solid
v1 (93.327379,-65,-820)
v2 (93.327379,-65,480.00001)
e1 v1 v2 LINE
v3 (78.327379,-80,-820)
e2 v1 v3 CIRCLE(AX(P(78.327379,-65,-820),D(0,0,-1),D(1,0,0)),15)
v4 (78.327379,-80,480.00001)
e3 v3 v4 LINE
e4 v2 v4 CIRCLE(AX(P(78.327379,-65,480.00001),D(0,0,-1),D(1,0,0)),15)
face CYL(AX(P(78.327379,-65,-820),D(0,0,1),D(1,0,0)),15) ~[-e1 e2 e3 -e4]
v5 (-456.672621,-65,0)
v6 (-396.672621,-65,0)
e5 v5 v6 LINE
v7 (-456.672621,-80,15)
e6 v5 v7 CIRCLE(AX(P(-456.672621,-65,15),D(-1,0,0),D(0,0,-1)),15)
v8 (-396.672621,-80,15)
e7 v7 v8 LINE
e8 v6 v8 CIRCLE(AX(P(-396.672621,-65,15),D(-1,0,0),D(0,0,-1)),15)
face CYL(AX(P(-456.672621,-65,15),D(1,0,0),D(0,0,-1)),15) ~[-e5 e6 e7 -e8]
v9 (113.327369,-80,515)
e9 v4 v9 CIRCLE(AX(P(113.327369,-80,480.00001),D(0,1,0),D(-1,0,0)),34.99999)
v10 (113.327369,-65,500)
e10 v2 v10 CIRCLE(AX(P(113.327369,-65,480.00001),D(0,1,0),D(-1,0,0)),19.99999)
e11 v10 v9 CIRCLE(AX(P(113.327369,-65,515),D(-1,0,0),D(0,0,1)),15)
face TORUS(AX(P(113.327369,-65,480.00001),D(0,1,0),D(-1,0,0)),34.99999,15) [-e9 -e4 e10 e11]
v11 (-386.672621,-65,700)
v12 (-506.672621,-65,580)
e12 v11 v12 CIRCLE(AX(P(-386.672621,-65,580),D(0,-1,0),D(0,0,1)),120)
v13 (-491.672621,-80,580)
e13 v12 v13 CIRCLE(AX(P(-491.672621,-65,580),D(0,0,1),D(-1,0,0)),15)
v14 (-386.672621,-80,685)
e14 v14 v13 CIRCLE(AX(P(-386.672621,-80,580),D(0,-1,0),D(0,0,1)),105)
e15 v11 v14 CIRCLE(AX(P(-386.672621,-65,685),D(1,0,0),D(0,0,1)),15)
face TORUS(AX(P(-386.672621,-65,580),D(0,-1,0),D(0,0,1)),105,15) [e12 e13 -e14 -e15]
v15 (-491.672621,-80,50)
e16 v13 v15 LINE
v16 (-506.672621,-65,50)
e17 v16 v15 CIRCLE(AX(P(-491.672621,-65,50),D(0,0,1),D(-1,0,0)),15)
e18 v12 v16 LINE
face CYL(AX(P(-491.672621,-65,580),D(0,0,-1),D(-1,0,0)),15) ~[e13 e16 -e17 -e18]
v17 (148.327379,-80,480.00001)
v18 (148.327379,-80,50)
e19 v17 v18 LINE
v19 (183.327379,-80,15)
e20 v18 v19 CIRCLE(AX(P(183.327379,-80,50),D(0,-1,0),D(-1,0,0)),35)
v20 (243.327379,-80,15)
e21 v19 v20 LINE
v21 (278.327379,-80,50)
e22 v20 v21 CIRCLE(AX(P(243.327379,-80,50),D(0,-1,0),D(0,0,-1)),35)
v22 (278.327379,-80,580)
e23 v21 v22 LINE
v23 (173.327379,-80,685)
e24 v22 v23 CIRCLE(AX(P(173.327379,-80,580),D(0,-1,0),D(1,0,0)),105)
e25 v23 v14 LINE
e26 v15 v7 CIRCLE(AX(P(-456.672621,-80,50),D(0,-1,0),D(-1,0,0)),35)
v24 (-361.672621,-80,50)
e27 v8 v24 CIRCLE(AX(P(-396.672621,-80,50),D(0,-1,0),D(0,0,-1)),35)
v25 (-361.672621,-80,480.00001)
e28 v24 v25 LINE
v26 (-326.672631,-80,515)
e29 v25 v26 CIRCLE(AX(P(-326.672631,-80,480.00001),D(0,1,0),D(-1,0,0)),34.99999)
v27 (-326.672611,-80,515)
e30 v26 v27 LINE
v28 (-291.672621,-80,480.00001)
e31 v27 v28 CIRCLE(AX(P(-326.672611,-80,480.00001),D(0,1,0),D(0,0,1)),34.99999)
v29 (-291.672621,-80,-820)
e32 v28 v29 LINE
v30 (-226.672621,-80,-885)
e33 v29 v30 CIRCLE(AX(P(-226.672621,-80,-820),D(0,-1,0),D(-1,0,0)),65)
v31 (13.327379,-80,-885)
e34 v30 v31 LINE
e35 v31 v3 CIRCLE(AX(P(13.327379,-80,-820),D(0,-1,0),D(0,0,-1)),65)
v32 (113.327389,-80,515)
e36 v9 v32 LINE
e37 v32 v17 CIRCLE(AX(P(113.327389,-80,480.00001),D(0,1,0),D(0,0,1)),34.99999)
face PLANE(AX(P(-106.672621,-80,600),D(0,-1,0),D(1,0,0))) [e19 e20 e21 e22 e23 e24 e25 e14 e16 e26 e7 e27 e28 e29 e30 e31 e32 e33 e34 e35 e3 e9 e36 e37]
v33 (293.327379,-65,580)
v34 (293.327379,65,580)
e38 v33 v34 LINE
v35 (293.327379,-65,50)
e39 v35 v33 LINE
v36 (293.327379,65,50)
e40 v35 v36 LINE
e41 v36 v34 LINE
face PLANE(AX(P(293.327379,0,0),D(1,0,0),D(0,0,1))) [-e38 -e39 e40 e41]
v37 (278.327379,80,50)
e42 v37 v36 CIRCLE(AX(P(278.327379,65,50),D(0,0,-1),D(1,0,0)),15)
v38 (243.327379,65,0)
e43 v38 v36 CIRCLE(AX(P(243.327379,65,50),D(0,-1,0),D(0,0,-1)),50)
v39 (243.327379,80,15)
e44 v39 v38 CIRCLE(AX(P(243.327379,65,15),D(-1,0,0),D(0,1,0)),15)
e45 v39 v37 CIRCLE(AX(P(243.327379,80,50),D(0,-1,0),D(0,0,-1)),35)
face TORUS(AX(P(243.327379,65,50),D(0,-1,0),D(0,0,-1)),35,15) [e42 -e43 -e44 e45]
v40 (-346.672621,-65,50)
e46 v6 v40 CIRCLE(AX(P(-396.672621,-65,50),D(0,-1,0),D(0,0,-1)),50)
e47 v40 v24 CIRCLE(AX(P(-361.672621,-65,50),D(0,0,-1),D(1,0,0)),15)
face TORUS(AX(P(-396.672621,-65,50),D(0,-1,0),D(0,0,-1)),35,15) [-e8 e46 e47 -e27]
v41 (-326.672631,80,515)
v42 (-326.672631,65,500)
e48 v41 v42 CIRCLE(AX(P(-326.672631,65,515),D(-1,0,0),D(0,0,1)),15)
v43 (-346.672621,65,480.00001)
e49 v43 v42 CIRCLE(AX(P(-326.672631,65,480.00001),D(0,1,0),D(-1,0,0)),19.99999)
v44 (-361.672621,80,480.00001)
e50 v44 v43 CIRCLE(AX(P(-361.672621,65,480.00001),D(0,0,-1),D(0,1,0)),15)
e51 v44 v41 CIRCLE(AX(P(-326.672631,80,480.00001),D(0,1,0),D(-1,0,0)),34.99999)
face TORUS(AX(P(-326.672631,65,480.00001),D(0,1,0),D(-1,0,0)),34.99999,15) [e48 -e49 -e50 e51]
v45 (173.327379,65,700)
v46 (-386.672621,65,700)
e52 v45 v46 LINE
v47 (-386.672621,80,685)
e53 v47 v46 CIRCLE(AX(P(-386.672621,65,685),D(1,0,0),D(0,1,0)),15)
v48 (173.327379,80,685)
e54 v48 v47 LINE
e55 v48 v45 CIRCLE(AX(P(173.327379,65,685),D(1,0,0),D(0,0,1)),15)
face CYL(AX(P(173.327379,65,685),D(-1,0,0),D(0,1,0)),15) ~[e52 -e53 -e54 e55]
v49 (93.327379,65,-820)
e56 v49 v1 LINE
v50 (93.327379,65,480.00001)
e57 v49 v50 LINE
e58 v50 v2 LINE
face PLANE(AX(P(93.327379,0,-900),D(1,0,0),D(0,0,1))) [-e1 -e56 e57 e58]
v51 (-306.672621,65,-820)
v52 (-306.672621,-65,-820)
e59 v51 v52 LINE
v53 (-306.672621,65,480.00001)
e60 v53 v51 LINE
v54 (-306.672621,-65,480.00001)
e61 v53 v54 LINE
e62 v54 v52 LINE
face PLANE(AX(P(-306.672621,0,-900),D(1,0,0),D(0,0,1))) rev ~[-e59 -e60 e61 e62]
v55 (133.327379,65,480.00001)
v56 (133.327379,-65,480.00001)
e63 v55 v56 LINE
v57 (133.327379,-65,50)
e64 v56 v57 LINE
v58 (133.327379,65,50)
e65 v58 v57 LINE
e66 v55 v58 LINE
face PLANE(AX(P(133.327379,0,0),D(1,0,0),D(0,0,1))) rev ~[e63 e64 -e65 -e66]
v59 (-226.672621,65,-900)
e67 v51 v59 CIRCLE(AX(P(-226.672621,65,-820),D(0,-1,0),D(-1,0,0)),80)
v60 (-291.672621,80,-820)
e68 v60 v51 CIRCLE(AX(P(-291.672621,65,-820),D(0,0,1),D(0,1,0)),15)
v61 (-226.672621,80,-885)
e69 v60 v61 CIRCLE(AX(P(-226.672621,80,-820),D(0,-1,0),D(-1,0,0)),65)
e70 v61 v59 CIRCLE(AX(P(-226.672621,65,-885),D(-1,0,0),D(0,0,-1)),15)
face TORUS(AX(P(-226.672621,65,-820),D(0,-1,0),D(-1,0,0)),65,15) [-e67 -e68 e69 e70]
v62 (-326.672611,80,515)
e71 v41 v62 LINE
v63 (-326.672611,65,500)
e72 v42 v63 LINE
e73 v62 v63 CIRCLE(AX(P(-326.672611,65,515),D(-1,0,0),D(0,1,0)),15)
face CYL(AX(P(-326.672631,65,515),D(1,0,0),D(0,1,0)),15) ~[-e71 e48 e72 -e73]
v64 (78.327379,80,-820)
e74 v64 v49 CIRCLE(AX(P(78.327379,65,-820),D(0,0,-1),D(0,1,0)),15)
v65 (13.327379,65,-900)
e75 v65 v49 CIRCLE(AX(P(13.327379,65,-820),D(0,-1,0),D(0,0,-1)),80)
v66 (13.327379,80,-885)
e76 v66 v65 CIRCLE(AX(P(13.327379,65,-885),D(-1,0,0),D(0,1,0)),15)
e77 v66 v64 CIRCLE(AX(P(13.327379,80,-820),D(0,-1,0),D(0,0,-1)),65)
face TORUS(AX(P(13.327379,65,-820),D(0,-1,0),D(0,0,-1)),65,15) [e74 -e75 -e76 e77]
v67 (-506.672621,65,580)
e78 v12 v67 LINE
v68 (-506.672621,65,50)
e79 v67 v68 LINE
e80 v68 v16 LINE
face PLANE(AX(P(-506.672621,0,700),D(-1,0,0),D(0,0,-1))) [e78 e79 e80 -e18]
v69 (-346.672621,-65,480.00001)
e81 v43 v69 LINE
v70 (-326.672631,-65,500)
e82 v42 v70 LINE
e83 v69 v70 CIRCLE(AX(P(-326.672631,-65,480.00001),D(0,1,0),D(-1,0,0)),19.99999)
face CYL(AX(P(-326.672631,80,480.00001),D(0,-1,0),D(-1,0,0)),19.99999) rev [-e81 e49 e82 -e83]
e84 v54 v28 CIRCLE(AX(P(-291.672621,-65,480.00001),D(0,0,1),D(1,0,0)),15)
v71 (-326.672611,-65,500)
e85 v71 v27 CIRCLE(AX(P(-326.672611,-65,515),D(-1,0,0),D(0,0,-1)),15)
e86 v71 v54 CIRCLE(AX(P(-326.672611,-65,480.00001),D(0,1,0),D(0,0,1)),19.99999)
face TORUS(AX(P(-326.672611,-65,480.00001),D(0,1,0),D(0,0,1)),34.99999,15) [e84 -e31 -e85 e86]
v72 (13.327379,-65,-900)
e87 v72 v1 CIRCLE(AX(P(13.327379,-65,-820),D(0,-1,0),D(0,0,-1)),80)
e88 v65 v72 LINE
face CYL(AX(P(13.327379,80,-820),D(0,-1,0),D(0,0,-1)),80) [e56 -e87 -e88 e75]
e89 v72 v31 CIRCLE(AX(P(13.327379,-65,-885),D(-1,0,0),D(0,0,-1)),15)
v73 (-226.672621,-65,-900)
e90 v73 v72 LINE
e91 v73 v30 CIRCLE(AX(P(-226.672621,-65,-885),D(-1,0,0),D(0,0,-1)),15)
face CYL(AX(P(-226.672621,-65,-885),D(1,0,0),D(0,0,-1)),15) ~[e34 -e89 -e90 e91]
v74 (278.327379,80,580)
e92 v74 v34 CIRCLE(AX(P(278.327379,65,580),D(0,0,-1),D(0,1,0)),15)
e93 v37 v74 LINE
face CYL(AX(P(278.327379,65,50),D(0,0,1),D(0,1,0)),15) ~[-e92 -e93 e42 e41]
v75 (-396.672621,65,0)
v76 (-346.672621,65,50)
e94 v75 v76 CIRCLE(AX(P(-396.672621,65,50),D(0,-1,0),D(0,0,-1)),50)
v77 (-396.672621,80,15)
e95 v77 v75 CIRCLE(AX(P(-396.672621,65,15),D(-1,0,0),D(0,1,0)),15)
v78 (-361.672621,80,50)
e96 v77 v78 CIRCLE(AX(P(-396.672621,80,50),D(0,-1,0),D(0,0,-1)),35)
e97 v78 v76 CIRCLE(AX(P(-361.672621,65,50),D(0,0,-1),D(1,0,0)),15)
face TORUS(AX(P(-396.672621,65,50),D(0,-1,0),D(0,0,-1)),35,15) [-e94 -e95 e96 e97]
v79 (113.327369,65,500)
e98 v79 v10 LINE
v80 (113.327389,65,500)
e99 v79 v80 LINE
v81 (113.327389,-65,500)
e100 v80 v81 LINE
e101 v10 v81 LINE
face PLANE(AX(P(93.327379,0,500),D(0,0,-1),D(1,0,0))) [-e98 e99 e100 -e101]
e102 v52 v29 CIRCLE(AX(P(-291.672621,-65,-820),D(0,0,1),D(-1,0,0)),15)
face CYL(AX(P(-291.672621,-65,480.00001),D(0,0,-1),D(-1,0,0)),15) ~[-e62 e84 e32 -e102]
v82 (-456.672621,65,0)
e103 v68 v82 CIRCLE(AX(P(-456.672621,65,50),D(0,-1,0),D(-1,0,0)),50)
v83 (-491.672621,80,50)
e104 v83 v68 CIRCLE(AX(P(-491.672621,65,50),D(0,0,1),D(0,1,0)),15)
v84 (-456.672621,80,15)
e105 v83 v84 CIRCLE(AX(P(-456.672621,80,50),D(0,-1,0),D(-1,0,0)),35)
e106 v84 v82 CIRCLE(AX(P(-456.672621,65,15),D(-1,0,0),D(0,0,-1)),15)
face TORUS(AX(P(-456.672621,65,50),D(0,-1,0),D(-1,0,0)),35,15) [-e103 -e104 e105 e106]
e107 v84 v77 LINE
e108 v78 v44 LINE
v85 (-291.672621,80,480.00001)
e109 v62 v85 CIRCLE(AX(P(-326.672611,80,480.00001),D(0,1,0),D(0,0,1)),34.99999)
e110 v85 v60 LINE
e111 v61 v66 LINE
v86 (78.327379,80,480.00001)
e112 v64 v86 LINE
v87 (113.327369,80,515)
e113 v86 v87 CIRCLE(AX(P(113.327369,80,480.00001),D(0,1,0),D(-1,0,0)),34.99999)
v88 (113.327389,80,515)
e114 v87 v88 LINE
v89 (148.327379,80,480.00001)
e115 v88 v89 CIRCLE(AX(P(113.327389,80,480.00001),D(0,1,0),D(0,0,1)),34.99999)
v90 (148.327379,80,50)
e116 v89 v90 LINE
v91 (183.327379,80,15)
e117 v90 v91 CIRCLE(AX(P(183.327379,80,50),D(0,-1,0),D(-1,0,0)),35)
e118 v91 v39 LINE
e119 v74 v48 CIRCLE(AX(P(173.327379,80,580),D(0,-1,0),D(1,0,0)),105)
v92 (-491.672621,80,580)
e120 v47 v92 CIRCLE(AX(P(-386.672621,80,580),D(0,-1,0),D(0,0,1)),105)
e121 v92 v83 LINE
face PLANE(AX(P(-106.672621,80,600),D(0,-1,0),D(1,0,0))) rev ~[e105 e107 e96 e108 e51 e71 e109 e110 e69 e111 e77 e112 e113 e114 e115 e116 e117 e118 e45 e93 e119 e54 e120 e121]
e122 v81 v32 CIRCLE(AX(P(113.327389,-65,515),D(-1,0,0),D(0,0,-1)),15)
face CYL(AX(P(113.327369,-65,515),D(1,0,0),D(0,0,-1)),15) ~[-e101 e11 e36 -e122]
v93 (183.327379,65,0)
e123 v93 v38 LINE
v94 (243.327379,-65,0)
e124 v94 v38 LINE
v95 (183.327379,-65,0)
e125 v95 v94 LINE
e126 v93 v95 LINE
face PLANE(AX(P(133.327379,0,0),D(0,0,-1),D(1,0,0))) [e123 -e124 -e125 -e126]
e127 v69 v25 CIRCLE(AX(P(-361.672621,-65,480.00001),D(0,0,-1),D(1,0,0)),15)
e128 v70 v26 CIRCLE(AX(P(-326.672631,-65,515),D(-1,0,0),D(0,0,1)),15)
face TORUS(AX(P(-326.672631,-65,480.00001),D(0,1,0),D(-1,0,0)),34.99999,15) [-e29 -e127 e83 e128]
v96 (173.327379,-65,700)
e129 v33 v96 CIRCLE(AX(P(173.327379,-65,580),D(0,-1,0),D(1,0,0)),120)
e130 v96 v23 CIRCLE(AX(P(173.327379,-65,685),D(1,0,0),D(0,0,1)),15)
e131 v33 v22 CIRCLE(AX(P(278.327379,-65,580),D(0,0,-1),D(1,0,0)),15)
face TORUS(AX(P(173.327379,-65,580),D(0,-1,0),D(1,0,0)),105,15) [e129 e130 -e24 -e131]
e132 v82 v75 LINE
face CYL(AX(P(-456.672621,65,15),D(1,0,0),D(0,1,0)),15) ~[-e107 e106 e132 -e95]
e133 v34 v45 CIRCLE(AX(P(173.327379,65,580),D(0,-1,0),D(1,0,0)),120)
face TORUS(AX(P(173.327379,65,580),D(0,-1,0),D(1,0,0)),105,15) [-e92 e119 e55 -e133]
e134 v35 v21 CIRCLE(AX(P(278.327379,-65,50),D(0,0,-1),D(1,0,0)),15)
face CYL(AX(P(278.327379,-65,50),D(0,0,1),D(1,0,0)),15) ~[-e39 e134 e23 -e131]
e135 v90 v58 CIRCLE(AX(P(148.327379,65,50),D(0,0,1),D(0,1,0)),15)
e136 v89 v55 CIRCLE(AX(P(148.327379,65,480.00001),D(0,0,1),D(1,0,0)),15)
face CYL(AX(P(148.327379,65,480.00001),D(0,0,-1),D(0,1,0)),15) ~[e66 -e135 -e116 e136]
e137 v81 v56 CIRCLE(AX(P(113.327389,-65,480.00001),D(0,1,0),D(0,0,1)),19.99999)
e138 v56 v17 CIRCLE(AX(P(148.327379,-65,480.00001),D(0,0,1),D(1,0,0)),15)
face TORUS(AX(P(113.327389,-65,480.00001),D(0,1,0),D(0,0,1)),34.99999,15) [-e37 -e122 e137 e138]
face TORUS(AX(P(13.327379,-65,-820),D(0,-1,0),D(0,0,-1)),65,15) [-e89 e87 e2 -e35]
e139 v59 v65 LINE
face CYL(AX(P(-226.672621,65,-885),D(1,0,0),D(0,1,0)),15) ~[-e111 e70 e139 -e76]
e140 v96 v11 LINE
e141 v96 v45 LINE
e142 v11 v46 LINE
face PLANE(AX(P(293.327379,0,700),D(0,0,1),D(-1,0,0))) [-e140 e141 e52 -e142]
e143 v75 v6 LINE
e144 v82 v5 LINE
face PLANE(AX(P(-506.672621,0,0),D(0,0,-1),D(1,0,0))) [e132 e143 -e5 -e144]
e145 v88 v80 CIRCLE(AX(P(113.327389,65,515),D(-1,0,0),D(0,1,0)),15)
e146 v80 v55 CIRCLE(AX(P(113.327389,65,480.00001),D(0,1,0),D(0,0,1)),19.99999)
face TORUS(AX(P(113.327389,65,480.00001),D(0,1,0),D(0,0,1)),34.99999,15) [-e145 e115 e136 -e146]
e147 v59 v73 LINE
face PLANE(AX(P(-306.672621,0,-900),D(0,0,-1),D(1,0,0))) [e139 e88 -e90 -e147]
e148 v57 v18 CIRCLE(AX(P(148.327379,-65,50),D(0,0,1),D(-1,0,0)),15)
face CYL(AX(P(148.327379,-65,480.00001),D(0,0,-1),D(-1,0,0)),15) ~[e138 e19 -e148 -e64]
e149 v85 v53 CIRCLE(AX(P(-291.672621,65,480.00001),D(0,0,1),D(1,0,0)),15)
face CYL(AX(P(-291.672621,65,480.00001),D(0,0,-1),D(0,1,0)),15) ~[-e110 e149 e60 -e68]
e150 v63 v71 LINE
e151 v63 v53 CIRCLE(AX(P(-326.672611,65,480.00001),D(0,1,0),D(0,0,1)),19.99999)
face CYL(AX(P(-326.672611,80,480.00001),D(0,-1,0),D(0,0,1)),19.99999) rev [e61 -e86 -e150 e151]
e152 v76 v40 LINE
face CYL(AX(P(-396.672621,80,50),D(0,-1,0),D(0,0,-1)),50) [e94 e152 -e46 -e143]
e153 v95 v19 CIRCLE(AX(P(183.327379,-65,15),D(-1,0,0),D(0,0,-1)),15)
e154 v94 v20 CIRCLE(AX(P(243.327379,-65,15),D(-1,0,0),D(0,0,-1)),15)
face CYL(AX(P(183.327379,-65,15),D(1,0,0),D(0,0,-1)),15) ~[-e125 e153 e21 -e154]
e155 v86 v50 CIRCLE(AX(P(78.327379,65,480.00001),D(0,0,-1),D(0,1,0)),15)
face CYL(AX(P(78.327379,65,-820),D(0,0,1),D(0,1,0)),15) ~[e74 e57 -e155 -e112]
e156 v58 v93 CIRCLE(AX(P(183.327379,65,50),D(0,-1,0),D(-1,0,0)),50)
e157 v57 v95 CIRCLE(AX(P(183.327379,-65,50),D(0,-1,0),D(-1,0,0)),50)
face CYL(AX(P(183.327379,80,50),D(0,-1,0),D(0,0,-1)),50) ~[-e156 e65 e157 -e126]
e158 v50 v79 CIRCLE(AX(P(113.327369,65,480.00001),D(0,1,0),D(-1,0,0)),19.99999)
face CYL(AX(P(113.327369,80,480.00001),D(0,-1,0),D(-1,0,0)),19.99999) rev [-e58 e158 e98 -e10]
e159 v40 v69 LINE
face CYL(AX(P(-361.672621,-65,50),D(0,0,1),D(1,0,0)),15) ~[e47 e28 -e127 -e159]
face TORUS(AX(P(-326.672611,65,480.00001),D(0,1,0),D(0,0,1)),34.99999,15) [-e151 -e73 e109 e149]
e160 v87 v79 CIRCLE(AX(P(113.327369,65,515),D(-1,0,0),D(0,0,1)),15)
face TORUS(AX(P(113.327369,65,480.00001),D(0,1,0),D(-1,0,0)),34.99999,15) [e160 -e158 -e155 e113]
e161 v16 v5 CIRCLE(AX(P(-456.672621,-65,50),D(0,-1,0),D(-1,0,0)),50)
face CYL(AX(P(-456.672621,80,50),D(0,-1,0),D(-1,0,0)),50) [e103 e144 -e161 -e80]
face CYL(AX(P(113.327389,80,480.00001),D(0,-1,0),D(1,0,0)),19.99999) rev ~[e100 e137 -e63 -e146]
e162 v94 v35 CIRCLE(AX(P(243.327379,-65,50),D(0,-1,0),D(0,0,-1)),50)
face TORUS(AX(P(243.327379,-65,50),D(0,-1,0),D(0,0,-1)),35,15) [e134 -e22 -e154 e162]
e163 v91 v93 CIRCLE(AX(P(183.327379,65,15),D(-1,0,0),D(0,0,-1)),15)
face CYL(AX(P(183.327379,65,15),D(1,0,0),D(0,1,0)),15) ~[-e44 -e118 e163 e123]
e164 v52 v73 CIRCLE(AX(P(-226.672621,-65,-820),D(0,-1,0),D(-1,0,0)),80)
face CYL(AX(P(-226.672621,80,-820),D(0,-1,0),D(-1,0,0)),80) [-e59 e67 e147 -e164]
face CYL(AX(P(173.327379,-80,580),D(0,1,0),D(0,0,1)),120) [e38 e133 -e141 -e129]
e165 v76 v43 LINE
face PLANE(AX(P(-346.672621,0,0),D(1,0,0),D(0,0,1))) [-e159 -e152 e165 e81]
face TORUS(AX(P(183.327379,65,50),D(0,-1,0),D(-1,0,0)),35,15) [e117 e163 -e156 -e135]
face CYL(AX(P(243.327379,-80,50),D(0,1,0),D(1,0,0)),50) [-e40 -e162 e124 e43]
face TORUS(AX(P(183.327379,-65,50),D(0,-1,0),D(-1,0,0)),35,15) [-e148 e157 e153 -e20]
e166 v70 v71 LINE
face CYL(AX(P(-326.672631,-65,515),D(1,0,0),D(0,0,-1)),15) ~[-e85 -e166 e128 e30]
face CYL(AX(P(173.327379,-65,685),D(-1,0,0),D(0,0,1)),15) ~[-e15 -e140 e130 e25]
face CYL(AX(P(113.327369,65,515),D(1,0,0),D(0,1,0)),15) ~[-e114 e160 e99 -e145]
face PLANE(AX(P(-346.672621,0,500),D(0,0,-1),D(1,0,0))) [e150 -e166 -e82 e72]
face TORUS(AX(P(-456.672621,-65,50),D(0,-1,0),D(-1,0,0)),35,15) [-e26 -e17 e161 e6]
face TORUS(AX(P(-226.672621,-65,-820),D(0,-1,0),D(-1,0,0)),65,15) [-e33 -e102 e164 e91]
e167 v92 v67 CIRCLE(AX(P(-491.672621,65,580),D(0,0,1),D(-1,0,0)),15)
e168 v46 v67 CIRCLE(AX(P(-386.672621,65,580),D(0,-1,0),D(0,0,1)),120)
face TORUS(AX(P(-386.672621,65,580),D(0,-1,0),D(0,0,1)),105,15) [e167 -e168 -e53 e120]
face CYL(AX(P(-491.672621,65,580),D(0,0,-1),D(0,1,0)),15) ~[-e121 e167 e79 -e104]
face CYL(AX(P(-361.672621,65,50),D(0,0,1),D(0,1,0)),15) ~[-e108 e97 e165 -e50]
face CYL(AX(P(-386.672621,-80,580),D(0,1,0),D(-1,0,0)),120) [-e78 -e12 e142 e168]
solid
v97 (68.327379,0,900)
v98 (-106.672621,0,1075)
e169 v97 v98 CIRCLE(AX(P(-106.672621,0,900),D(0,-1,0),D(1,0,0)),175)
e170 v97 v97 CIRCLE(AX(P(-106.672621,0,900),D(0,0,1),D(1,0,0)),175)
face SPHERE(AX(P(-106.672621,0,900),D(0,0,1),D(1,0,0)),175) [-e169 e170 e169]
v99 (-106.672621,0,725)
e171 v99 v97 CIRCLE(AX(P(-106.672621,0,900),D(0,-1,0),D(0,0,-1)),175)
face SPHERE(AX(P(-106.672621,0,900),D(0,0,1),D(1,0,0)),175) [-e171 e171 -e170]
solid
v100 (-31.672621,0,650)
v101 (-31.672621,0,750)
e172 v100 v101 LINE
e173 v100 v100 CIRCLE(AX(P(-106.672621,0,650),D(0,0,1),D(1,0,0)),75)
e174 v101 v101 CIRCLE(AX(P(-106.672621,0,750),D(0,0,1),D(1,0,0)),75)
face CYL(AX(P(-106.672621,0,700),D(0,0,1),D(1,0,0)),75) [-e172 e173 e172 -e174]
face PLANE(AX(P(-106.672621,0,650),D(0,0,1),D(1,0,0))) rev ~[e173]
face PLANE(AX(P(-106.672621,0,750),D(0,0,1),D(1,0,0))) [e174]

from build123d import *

# Parameters (mm, degrees)
F0_W      = 400
F0_H      = 200
F0_H_2    = 1400
F0_W_2    = 160
F0_H_3    = 500
F1_DEPTH  = 80
F2_R      = 120
F3_R      = 50
F4_R      = 19.99999
F5_R      = 80
F6_R      = 15
F9_R      = 75
F10_DEPTH = 50


# Not quite as in the source:
# - a fillet or chamfer is up to 0.001 mm smaller than in the source, because OpenCascade refuses the exact size


with BuildPart() as f1:
    # F0 (on Front) → F1 (new body, symmetric)
    with BuildSketch(Plane.XZ):
        with Locations((-106.6726207733, 600)):
            Rectangle(F0_W, F0_H)
        Polygon((-306.6726207733, 500), (-306.6726207733, 700), (-506.6726207733, 700), (-506.6726207733, 500), (-346.6726207733, 500), align=None)
        Polygon((293.3273792267, 700), (93.3273792267, 700), (93.3273792267, 500), (133.3273792267, 500), (293.3273792267, 500), align=None)
        with Locations((-106.6726207733, -200)):
            Rectangle(F0_W, F0_H_2)
        with Locations((-426.6726207733, 250)):
            Rectangle(F0_W_2, F0_H_3)
        with Locations((213.3273792267, 250)):
            Rectangle(F0_W_2, F0_H_3)
    extrude(amount=F1_DEPTH, both=True)

    # F2
    f2_edges = [f1.edges().sort_by_distance(p)[0] for p in [
        (293.327379, 0, 700),
        (-506.672621, 0, 700),
    ]]
    fillet(f2_edges, radius=F2_R)

    # F3
    f3_edges = [f1.edges().sort_by_distance(p)[0] for p in [
        (293.327379, 0, 0),
        (-346.672621, 0, 0),
        (133.327379, 0, 0),
        (-506.672621, 0, 0),
    ]]
    fillet(f3_edges, radius=F3_R)

    # F4 (radius 20 in the source; OpenCascade refuses exactly that, so slightly less here)
    f4_edges = [f1.edges().sort_by_distance(p)[0] for p in [
        (-346.672621, 0, 500),
        (93.327379, 0, 500),
        (-306.672621, 0, 500),
        (133.327379, 0, 500),
    ]]
    fillet(f4_edges, radius=F4_R)

    # F5
    f5_edges = [f1.edges().sort_by_distance(p)[0] for p in [
        (-306.672621, 0, -900),
        (93.327379, 0, -900),
    ]]
    fillet(f5_edges, radius=F5_R)

    # F6
    f6_edges = [f1.edges().sort_by_distance(p)[0] for p in [
        (-106.672621, -80, 700),
        (93.327379, 80, -169.999995),
    ]]
    fillet(f6_edges, radius=F6_R)


with BuildPart() as f8:
    # F7 (on Front) → F8 (revolve)
    with BuildSketch(Plane.XZ):
        with BuildLine():
            ThreePointArc((-106.6726207733, 725), (17.0710659343, 776.2563132924), (68.3273792267, 900))
            ThreePointArc((68.3273792267, 900), (17.0710659343, 1023.7436867076), (-106.6726207733, 1075))
            Line((-106.6726207733, 1075), (-106.6726207733, 725))
        make_face()
    revolve(axis=Axis((-106.6726207733, 0, 900), (0, 0, 1)))


with BuildPart() as f10:
    # F9 (on face) → F10 (new body, symmetric)
    with BuildSketch(Plane.XY.offset(700)):
        with Locations((-106.6726207733, 0)):
            Circle(F9_R)
    extrude(amount=F10_DEPTH, both=True)


solid = Compound([f1.part, f8.part, f10.part])
